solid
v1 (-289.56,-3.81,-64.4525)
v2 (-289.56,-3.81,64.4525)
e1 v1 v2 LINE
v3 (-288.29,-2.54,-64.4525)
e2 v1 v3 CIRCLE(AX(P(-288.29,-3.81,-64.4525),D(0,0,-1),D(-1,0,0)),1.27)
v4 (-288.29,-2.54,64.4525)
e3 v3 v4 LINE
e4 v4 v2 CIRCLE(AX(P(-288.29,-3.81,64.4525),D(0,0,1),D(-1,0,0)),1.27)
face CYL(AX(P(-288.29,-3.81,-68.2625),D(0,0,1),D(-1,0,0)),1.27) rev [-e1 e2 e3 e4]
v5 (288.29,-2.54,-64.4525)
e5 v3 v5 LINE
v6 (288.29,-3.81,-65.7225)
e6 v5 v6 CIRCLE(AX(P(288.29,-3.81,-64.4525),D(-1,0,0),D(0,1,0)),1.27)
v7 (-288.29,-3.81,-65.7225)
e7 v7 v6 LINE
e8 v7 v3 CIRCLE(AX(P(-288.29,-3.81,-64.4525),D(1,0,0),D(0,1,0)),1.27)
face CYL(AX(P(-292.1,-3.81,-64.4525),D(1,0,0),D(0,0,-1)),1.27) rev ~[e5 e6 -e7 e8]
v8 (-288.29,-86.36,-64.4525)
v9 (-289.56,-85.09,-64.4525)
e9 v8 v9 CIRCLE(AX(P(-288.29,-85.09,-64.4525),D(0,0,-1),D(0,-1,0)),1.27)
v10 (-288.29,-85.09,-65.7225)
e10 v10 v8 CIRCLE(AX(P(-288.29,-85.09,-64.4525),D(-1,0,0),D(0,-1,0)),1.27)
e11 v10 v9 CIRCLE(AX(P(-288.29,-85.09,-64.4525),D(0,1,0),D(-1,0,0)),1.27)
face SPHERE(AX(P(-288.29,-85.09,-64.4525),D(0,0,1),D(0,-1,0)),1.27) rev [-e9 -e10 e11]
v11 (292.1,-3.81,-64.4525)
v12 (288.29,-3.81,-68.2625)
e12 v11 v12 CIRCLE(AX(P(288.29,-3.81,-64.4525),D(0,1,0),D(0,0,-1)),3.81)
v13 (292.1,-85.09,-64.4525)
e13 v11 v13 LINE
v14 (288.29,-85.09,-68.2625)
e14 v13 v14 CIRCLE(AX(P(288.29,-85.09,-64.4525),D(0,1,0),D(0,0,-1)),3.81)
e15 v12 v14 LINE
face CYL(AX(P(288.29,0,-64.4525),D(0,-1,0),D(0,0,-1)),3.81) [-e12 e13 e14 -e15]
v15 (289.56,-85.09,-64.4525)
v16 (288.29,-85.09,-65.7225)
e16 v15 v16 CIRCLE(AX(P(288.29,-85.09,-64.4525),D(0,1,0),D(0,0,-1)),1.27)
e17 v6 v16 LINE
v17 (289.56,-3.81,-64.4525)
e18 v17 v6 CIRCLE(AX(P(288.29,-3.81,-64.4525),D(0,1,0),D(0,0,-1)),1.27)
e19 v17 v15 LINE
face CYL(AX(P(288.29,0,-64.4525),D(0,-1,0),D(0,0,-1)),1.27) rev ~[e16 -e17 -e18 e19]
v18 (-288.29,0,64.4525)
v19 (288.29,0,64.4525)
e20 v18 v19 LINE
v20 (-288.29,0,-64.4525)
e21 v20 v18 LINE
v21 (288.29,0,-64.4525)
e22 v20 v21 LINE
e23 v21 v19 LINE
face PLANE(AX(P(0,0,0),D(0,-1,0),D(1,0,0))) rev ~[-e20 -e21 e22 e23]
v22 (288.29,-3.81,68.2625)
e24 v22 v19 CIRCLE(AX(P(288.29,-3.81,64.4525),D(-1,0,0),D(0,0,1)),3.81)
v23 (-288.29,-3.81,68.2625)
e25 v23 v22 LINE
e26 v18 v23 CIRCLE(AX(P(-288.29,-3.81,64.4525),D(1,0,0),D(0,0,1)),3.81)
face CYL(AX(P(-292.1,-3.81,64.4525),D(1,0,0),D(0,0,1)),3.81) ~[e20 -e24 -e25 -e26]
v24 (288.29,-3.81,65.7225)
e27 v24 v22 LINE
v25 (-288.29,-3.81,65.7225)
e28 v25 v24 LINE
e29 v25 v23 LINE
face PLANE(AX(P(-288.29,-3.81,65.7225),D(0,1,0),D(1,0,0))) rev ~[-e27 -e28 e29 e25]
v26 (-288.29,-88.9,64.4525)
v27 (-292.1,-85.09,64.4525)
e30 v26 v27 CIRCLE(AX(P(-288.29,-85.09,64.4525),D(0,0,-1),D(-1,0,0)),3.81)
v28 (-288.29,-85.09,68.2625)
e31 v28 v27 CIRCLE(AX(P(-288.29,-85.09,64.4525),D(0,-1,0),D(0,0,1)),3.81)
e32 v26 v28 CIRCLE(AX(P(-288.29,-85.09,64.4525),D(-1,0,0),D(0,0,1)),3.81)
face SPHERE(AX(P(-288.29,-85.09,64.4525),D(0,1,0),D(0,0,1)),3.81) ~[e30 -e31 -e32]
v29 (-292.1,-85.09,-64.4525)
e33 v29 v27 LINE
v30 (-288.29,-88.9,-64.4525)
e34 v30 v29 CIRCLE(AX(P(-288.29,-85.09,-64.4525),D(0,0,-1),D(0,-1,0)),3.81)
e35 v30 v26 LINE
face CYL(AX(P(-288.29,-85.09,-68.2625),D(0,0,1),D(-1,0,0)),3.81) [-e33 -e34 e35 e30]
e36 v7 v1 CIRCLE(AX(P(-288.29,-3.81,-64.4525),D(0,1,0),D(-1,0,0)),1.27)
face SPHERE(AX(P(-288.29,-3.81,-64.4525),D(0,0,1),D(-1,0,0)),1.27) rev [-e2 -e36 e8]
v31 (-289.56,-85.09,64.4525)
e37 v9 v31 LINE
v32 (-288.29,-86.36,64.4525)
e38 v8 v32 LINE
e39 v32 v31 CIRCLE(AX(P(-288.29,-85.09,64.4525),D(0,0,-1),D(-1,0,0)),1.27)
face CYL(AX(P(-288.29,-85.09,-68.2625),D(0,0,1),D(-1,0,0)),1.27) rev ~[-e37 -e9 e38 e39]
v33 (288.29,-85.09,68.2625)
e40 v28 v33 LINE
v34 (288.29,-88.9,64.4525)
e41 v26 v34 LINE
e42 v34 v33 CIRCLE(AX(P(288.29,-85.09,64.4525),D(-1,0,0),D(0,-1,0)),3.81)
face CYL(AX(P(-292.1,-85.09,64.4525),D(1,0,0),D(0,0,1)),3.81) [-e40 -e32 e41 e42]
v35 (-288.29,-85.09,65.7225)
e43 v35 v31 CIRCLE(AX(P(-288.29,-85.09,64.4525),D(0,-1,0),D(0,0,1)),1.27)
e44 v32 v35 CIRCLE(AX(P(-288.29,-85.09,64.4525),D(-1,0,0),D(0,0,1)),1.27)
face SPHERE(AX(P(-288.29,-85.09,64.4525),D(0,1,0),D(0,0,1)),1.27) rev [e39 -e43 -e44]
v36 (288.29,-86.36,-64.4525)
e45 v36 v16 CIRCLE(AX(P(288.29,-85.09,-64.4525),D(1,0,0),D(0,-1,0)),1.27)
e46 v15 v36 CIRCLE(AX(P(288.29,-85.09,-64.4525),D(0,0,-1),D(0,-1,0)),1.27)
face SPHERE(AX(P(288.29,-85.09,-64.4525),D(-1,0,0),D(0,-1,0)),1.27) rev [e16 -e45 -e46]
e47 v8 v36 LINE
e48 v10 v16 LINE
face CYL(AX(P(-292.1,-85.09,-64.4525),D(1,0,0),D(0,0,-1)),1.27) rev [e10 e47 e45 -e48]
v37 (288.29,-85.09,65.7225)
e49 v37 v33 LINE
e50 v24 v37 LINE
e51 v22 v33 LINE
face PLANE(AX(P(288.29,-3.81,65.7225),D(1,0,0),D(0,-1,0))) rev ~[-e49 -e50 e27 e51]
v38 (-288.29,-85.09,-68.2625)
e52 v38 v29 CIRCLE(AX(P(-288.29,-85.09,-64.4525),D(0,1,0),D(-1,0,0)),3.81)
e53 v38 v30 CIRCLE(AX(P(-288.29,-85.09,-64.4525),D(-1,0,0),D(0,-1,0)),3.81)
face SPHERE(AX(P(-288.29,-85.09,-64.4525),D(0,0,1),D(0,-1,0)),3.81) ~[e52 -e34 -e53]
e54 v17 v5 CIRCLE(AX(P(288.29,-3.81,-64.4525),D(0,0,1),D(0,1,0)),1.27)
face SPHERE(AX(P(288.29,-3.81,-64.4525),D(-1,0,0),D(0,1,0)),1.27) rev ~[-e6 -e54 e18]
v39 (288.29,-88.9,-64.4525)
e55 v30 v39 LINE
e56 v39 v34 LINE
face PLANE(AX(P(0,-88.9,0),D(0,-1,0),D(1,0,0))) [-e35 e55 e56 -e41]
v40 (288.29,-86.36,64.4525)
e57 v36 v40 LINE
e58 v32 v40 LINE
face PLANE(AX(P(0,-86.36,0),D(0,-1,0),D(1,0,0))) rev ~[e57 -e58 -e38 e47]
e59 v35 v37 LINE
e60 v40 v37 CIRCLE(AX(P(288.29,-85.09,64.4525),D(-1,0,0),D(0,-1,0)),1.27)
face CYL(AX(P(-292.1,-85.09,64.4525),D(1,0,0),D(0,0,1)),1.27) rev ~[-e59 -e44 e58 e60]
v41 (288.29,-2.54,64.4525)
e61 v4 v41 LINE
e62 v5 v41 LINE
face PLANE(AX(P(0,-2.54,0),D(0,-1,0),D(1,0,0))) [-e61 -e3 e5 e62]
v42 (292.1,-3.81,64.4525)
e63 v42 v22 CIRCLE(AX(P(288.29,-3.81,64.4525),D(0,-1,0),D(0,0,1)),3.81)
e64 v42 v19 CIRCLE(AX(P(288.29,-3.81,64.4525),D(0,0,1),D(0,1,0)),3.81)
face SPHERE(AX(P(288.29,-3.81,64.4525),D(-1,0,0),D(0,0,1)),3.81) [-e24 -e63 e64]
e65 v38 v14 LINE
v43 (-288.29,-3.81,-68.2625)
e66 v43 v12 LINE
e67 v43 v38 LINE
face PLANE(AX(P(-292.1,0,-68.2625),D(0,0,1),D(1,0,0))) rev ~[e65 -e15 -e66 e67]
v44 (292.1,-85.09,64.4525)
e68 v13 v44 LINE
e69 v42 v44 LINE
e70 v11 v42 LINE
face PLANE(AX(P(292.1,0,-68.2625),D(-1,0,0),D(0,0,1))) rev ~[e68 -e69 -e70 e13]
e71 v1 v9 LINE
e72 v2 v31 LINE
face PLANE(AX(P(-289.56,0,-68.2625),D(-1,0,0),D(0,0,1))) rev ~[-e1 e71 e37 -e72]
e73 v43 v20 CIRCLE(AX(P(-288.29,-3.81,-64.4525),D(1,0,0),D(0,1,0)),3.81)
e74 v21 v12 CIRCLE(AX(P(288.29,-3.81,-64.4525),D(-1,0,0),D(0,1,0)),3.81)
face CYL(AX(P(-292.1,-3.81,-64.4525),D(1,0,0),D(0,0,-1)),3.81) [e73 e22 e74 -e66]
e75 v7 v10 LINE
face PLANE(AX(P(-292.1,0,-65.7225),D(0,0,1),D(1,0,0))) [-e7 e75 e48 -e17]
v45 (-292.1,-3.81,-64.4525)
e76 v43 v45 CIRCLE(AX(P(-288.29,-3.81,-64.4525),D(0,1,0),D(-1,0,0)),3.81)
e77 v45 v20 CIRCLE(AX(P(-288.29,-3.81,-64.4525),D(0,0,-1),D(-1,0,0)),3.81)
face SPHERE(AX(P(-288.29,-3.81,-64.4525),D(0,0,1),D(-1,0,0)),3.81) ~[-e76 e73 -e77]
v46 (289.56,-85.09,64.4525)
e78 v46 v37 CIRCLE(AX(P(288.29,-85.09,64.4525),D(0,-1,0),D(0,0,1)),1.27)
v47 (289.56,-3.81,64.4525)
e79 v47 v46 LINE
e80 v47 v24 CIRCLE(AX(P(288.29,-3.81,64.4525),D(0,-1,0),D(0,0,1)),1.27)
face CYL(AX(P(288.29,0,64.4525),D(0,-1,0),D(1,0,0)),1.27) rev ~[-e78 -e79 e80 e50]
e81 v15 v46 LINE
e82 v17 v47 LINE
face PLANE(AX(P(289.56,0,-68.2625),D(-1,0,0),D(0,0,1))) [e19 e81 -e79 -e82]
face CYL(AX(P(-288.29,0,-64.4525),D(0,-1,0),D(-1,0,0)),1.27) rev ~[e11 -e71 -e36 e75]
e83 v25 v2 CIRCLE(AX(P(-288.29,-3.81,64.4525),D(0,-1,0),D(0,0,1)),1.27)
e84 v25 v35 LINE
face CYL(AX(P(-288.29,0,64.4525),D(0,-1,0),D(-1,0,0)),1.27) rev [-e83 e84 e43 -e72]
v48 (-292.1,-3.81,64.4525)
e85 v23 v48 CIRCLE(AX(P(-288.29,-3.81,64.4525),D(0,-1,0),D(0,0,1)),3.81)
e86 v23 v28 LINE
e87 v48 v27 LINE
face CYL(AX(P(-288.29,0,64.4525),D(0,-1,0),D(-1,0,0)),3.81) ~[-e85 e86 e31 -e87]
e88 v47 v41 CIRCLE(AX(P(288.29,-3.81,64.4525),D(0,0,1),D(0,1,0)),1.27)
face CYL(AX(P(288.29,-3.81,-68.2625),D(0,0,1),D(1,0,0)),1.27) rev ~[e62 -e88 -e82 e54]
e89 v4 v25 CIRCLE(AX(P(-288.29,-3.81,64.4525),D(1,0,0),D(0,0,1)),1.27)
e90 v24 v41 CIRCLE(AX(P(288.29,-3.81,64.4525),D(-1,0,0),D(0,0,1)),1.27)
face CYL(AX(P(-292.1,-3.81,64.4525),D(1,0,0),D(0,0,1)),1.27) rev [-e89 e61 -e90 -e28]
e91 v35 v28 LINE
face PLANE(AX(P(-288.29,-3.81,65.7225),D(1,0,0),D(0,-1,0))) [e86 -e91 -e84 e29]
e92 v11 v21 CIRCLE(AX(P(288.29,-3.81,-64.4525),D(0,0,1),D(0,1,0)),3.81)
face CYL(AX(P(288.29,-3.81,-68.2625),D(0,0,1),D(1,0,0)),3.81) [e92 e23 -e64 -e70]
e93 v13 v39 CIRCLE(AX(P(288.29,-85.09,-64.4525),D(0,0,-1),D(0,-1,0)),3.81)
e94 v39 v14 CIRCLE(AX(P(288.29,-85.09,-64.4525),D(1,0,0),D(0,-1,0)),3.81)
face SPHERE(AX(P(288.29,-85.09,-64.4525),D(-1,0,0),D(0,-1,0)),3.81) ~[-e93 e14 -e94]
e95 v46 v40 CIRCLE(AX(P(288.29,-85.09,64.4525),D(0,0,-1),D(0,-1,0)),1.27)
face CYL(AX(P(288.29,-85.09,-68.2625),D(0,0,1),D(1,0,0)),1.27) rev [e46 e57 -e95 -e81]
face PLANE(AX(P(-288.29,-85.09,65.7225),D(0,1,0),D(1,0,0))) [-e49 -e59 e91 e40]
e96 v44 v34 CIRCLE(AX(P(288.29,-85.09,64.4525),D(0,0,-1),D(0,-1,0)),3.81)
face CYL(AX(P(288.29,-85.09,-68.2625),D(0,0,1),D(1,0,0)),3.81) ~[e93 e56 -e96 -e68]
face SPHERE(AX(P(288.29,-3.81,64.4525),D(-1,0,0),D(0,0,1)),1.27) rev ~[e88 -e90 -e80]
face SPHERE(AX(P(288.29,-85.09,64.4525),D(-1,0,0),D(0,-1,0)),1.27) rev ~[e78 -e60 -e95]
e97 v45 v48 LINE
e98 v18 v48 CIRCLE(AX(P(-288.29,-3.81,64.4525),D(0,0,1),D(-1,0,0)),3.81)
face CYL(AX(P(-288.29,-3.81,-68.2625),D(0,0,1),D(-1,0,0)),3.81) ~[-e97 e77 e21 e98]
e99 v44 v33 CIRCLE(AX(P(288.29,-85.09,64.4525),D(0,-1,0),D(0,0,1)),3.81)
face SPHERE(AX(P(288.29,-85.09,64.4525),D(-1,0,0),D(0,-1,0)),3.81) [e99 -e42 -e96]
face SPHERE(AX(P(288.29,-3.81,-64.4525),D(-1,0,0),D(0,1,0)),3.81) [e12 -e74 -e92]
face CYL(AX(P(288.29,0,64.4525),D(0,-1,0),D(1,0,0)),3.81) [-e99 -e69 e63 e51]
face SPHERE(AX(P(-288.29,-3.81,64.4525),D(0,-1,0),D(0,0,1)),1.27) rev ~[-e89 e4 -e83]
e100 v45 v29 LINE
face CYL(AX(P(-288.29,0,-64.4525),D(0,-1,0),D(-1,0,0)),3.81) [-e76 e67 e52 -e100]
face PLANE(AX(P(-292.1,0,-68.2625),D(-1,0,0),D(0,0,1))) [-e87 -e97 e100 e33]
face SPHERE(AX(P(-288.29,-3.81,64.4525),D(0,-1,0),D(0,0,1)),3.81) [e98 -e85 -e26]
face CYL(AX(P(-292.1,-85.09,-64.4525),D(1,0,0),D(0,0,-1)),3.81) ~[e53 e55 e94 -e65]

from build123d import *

# Parameters (mm, degrees)
F0_W     = 584.2
F0_H     = 136.525
F1_DEPTH = 88.9
F2_R     = 3.81
F3_T     = -2.54


# Not quite as in the source:
# - a shell that OpenCascade refuses in one call is made with other operations: the cavity is built on its own and cut out


with BuildPart() as f1:
    # F0 (on Front) → F1 (new body)
    with BuildSketch(Plane.XZ):
        Rectangle(F0_W, F0_H)
    extrude(amount=F1_DEPTH)

    # F2
    f2_edges = [f1.edges().sort_by_distance(p)[0] for p in [
        (-292.1, -44.45, 68.2625),
        (0, 0, 68.2625),
        (0, -88.9, 68.2625),
        (-292.1, -88.9, 0),
        (0, -88.9, -68.2625),
        (292.1, -88.9, 0),
        (292.1, -44.45, 68.2625),
        (-292.1, 0, 0),
        (-292.1, -44.45, -68.2625),
        (0, 0, -68.2625),
        (292.1, 0, 0),
        (292.1, -44.45, -68.2625),
    ]]
    fillet(f2_edges, radius=F2_R)

    # F3: a shell. OpenCascade refuses it in one call, so the cavity is built on its own and cut out:
    # the body offset inwards by the wall thickness, plus a prism from it out through each open face.
    f3_core = offset(f1.part, amount=F3_T, mode=Mode.PRIVATE)
    f3_exits = [f3_core.faces().sort_by_distance(p)[0] for p in [
        (0, -44.45, 65.7225),
    ]]
    add(f3_core, mode=Mode.SUBTRACT)
    extrude(f3_exits, amount=-F3_T, mode=Mode.SUBTRACT)


solid = f1.part
